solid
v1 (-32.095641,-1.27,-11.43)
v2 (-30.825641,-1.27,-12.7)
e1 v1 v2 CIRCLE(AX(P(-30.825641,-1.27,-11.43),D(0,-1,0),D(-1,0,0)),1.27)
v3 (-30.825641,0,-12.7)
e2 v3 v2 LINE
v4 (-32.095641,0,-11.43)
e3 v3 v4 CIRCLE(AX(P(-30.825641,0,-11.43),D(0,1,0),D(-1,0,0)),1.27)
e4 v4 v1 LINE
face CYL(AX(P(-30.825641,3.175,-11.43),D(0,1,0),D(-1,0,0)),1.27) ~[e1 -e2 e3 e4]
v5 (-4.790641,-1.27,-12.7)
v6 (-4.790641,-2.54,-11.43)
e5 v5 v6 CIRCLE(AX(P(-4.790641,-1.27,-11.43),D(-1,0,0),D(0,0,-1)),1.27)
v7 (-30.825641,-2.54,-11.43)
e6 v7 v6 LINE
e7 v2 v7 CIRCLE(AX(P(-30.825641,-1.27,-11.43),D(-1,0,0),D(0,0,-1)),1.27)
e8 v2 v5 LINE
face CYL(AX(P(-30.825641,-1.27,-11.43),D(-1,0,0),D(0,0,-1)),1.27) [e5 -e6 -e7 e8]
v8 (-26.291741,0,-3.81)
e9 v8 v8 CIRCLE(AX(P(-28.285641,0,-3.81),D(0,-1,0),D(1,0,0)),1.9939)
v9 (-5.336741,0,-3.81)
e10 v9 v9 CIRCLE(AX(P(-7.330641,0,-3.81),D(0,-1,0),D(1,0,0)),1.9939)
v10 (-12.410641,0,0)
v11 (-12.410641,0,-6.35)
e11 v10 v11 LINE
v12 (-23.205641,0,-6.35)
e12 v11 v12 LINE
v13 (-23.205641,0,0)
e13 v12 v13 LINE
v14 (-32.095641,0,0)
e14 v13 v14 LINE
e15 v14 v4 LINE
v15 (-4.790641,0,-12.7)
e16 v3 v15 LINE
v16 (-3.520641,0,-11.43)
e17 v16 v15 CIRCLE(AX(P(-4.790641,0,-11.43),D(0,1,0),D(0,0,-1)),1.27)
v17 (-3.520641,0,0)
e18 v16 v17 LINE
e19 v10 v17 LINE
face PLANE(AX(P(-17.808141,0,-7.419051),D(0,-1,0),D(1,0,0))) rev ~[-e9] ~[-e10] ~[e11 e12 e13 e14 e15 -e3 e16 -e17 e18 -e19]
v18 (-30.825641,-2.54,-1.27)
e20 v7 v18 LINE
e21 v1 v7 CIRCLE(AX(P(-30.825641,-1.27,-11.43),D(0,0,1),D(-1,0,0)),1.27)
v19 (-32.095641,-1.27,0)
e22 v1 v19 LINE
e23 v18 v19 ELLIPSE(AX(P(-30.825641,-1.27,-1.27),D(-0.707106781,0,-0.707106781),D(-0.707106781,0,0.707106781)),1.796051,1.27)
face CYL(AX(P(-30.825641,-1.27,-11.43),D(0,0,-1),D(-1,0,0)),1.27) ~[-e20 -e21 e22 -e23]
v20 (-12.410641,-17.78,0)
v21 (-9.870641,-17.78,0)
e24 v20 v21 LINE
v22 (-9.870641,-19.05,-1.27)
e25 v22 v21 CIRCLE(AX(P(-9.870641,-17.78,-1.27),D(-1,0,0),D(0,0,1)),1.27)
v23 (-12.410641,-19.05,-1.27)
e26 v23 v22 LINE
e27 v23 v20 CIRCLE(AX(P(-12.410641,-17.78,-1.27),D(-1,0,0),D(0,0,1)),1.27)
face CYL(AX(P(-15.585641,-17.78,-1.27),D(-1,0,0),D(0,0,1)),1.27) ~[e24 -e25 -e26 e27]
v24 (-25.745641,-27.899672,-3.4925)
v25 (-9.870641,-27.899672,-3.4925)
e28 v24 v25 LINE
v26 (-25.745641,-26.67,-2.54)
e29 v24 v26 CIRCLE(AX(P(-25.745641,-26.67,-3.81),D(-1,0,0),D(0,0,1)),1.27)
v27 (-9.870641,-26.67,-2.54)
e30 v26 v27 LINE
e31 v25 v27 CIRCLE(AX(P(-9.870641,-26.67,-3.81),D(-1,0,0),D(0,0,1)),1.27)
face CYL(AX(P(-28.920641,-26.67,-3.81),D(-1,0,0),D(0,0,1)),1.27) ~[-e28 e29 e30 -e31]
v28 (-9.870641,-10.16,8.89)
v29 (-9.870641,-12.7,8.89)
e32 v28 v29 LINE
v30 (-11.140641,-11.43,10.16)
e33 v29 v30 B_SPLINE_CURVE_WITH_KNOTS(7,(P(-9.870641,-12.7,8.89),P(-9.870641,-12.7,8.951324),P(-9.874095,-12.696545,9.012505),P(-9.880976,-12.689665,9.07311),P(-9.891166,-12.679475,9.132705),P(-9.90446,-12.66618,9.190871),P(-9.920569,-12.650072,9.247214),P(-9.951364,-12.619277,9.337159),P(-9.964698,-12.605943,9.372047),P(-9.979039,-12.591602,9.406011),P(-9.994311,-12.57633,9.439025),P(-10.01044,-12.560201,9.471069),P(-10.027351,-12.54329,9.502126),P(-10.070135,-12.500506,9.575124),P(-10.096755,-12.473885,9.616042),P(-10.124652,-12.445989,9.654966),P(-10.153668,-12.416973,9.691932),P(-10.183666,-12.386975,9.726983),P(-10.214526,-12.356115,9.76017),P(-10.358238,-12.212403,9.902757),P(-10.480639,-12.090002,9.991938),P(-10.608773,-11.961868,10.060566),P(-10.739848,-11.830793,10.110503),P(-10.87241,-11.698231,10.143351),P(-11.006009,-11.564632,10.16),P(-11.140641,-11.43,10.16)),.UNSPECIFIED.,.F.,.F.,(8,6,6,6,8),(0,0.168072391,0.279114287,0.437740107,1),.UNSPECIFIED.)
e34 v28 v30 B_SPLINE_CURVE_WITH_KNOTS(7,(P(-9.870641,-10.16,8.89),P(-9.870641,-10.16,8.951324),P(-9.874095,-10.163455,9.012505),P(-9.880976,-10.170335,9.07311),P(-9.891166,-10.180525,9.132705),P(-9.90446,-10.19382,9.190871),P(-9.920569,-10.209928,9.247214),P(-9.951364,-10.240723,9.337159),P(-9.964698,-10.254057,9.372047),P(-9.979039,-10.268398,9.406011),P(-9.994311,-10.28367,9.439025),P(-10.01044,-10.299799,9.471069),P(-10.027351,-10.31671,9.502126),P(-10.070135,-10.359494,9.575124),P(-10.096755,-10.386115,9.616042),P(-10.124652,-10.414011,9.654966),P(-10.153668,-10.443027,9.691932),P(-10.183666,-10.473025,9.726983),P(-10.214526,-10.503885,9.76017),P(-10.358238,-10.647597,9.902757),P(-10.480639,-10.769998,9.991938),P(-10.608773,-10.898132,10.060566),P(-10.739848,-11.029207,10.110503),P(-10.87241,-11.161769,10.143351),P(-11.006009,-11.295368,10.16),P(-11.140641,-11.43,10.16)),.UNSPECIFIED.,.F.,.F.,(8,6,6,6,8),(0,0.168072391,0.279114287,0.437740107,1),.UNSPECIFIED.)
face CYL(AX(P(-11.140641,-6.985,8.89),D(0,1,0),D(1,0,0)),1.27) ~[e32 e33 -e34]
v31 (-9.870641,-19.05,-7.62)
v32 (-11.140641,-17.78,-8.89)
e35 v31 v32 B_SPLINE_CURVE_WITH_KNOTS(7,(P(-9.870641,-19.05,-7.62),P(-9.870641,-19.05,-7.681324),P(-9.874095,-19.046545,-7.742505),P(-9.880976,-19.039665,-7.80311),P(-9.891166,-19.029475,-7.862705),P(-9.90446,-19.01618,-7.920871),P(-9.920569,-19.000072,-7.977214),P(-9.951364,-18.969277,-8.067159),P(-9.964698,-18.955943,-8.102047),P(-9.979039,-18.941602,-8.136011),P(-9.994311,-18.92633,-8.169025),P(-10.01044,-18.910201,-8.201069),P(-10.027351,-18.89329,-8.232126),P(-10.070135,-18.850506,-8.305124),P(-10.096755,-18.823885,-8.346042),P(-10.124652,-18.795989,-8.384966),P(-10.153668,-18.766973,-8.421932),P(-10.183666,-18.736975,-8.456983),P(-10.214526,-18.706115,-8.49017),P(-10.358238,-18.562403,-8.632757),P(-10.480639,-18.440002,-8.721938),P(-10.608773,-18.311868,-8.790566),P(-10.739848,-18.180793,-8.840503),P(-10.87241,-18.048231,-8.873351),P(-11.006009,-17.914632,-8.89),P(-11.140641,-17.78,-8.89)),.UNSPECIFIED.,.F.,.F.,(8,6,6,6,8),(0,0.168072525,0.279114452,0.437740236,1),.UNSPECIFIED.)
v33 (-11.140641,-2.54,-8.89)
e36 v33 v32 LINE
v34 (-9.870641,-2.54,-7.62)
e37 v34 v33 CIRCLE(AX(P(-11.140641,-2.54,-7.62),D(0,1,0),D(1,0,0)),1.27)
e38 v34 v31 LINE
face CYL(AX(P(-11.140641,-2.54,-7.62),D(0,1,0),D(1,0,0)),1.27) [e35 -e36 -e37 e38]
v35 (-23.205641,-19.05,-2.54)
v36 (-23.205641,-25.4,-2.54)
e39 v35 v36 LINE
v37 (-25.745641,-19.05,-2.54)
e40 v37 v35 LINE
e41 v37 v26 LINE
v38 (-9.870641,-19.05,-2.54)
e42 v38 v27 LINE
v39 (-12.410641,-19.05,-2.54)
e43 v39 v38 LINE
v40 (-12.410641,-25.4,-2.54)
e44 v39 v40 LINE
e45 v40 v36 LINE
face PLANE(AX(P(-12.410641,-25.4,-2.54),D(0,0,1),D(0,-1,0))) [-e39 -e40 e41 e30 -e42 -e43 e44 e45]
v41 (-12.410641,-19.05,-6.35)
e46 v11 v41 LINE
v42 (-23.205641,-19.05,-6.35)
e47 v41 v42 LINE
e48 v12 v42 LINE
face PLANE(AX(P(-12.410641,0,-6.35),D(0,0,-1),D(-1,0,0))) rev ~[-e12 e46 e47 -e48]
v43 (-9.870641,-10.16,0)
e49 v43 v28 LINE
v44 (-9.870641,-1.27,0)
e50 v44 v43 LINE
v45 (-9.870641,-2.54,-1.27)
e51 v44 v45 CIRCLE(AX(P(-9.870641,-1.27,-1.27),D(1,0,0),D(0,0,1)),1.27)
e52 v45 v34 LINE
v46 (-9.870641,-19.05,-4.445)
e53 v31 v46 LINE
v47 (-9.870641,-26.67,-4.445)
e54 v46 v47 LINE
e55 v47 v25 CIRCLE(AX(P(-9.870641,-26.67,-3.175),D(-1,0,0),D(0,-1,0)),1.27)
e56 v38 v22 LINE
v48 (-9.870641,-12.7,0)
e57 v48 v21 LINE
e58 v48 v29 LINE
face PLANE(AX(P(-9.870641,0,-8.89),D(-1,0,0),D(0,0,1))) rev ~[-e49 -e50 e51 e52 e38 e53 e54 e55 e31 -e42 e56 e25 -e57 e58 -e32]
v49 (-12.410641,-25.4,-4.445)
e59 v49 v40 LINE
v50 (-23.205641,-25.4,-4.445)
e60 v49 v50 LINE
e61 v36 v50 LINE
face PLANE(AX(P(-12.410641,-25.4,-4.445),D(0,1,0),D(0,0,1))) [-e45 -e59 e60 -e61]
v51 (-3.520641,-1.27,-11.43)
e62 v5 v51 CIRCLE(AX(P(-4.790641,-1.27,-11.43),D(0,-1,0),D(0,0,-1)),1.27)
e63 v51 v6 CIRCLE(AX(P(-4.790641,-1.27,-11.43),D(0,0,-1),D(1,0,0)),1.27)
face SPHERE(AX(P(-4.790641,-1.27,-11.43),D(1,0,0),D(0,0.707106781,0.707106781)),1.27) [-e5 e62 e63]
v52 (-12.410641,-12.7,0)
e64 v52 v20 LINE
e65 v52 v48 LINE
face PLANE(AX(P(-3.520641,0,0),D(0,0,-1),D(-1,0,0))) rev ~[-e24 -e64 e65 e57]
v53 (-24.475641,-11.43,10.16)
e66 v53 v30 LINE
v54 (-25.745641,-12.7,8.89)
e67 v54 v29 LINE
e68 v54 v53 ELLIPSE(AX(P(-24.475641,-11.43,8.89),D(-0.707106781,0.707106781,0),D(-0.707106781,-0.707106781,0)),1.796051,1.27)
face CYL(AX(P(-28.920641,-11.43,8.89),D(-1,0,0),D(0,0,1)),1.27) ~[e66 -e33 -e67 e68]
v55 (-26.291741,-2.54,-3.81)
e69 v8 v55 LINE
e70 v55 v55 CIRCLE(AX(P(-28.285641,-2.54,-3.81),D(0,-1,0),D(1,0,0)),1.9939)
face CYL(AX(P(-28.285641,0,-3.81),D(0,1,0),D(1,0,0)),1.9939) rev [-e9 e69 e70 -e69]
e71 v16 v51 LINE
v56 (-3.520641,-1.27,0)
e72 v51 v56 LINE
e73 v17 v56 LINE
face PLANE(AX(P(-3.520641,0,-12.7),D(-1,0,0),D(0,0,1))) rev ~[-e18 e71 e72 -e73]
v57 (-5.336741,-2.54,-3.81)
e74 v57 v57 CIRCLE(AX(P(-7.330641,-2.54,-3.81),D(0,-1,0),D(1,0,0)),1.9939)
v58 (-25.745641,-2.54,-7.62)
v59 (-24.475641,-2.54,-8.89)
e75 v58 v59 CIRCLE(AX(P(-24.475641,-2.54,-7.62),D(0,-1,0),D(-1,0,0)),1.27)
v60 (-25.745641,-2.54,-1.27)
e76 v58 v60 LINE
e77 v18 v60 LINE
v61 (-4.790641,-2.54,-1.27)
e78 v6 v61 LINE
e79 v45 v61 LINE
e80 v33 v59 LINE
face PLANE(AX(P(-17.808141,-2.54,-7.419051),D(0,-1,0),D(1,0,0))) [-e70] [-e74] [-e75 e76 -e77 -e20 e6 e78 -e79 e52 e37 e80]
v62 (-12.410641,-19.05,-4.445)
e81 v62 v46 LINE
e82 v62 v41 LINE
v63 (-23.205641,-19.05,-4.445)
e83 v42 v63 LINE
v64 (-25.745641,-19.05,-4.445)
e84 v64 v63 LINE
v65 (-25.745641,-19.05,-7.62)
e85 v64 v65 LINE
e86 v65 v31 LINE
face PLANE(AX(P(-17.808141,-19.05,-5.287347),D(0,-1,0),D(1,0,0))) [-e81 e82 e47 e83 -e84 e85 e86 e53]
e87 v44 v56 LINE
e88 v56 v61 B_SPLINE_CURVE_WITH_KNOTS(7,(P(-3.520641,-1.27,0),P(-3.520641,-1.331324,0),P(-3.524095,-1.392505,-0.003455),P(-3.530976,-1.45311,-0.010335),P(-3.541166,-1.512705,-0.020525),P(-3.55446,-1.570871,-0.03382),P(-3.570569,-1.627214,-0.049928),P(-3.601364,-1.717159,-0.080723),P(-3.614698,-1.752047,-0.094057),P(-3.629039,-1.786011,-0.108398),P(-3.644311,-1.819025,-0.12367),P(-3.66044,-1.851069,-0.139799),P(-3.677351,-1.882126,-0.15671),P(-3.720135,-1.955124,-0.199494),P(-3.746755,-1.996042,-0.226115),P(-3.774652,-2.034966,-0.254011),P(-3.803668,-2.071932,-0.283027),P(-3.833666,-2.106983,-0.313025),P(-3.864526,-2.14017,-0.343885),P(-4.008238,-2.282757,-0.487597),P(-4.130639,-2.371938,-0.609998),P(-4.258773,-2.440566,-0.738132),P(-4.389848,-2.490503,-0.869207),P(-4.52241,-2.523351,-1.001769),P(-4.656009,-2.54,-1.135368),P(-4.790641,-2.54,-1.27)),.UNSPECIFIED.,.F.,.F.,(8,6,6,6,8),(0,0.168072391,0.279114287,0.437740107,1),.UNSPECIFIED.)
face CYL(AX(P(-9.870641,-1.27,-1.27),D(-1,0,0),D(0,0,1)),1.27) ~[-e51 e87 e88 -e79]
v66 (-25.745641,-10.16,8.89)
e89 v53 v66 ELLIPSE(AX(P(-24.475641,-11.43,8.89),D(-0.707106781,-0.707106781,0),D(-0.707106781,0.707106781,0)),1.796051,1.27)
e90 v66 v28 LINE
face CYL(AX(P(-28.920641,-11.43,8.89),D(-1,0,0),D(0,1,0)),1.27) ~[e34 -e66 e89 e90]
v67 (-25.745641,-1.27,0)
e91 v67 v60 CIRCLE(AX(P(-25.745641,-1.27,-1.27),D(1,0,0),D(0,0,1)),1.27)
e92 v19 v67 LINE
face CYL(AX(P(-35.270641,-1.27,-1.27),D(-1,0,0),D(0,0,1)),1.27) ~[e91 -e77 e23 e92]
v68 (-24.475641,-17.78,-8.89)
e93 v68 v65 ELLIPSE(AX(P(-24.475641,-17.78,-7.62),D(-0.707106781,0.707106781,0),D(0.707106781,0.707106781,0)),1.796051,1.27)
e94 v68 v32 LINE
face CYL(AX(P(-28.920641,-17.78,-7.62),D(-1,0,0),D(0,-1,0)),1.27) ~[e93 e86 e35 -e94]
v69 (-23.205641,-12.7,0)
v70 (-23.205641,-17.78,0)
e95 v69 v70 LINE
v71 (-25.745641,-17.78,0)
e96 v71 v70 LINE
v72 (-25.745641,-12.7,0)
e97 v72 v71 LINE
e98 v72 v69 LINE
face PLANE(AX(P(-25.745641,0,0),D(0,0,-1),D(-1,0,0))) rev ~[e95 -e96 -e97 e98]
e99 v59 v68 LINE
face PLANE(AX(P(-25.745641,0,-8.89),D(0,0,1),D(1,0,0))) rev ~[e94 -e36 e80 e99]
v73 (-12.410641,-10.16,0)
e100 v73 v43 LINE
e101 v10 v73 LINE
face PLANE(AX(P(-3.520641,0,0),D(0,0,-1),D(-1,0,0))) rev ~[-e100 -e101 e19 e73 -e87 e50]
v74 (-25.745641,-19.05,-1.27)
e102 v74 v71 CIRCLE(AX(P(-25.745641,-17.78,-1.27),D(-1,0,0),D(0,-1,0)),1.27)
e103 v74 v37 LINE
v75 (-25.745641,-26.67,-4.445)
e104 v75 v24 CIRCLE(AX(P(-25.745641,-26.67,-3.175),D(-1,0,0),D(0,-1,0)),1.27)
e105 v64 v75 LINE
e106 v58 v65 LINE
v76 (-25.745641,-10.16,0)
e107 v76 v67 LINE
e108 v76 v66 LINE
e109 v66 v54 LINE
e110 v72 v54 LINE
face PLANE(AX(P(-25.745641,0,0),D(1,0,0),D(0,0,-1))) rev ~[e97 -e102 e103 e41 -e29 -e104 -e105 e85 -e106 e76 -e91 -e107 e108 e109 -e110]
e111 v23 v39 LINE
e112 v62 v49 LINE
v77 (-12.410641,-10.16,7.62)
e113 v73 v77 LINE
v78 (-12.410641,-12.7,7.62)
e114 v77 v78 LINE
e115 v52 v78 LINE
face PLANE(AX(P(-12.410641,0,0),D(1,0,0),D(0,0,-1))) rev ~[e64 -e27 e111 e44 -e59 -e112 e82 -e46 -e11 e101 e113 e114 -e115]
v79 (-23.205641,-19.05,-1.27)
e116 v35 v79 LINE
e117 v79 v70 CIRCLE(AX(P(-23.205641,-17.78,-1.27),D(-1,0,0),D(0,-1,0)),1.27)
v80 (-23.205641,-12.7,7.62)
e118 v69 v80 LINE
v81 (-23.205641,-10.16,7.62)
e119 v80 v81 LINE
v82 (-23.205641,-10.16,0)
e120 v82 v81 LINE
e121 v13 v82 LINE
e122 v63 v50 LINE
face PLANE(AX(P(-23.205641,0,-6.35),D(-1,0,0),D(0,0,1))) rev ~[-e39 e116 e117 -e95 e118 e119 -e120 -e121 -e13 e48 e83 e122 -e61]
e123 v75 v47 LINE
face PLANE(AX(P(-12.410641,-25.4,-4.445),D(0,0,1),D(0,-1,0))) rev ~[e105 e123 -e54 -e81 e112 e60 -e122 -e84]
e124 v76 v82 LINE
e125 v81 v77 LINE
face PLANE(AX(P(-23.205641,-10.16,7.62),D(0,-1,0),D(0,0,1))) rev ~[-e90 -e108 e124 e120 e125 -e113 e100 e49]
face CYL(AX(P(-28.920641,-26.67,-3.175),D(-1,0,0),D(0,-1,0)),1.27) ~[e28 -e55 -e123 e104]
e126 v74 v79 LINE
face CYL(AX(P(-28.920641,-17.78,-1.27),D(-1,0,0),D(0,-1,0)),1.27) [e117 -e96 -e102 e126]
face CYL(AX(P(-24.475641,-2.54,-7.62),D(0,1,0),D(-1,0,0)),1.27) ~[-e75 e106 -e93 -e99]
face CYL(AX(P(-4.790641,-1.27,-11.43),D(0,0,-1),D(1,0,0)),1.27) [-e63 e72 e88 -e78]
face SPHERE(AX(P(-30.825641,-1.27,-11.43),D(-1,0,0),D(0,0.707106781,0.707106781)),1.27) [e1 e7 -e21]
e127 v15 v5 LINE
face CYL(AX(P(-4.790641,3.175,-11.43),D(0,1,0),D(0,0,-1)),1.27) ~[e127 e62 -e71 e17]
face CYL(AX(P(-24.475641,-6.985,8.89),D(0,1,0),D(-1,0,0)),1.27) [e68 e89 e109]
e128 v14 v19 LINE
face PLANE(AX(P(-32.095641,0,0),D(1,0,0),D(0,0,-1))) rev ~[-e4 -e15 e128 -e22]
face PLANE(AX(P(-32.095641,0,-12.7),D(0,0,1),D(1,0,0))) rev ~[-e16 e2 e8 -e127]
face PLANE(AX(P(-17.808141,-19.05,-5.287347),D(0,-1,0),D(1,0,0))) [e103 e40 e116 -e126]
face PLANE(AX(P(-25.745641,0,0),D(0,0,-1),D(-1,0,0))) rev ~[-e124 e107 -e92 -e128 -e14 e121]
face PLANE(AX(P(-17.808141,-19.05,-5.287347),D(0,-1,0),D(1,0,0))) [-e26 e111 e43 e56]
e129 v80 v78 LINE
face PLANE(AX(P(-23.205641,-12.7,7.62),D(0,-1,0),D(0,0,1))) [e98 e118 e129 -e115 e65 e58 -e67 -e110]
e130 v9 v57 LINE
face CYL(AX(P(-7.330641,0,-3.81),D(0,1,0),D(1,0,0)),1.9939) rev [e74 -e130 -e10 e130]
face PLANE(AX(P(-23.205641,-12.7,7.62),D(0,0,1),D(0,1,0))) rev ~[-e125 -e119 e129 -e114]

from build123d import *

# Parameters (mm, degrees)
F1_DEPTH      = 19.05
F0_R          = 1.9939
F2_DEPTH      = 2.54
F3_W          = 2.54
F3_H          = 1.905
F4_DEPTH      = 8.89
F5_W          = 2.54
F5_H          = 1.905
F6_DEPTH      = 11.43
F7_W          = 2.54
F7_H          = 2.54
F8_W          = 2.54
F8_H          = 2.54
F9_DEPTH      = 10.16
F10_W         = 2.54
F10_H         = 2.54
F11_DEPTH     = 11.43
F12_T1_DEPTH  = 9.525
F12_T3_DEPTH  = 14.605
F12_T5_DEPTH  = 26.035
F12_T7_DEPTH  = 9.525
F12_T9_DEPTH  = 4.445
F12_T11_DEPTH = 19.685
F12_T13_DEPTH = 22.225
F12_T15_DEPTH = 8.89
F12_T17_DEPTH = 8.89
F12_T19_DEPTH = 8.89
F12_S23_W     = 1.27
F12_S23_H     = 1.27
F12_T24_DEPTH = 1.27
F12_S29_W     = 1.27
F12_S29_H     = 1.27
F12_T30_DEPTH = 1.27


# Not quite as in the source:
# - a fillet or chamfer that OpenCascade refuses, or shapes differently, is made with other operations: its cross-section is extruded or revolved along the edge and cut away or added


with BuildPart() as f1:
    # F0 (on Front) → F1 (new body)
    with BuildSketch(Plane.XZ):
        Polygon((-23.2056408978, -6.35), (-23.2056408978, 0), (-25.7456408978, 0), (-25.7456408978, -8.89), (-9.8706408978, -8.89), (-9.8706408978, 0), (-12.4106408978, 0), (-12.4106408978, -6.35), align=None)
    extrude(amount=F1_DEPTH)

    # F0 (on Front) → F2 (join)
    with BuildSketch(Plane.XZ):
        Polygon((-25.7456408978, -8.89), (-25.7456408978, 0), (-32.0956408978, 0), (-32.0956408978, -12.7), (-3.5206408978, -12.7), (-3.5206408978, 0), (-9.8706408978, 0), (-9.8706408978, -8.89), align=None)
        with Locations((-28.2856408978, -3.81)):
            Circle(F0_R, mode=Mode.SUBTRACT)
        with Locations((-7.3306408978, -3.81)):
            Circle(F0_R, mode=Mode.SUBTRACT)
    extrude(amount=F2_DEPTH)

    # F3 (on face) → F4 (join)
    with BuildSketch(Plane.XZ.offset(19.05)):
        with Locations((-11.1406408978, -3.4925)):
            Rectangle(F3_W, F3_H)
        with Locations((-24.4756408978, -3.4925)):
            Rectangle(F3_W, F3_H)
    extrude(amount=F4_DEPTH)

    # F5 (on face) → F6 (join)
    with BuildSketch(Plane(origin=(-12.4106408978, 0, 0), x_dir=(0, -1, 0), z_dir=(-1, 0, 0))):
        with Locations((26.67, -3.4925)):
            Rectangle(F5_W, F5_H)
    extrude(amount=F6_DEPTH)

    # F7 (on face) + F8 (on face) → F9 (join)
    with BuildSketch(Plane.XY):
        with Locations((-24.4756408978, -11.43)):
            Rectangle(F7_W, F7_H)
    with BuildSketch(Plane.XY):
        with Locations((-11.1406408978, -11.43)):
            Rectangle(F8_W, F8_H)
    extrude(amount=F9_DEPTH)

    # F10 (on face) → F11 (join)
    with BuildSketch(Plane.YZ.offset(-23.2056408978)):
        with Locations((-11.43, 8.89)):
            Rectangle(F10_W, F10_H)
    extrude(amount=F11_DEPTH)

    # F12: fillet of radius 1.27 on 18 edges, made by hand

    # F12_s2 → F12_t1 (cut)
    with BuildSketch(Plane.YZ.offset(-35.2706408978)):
        with BuildLine():
            ThreePointArc((-1.27, 0), (-2.1680256121, -0.3719743879), (-2.54, -1.27))
            Line((-2.54, -1.27), (-2.54, 0))
            Line((-2.54, 0), (-1.27, 0))
        make_face()
    extrude(amount=F12_T1_DEPTH, mode=Mode.SUBTRACT)

    # F12_s4 → F12_t3 (cut)
    with BuildSketch(Plane.XY.offset(-11.43)):
        with BuildLine():
            ThreePointArc((-32.0956408978, -1.27), (-31.7236665099, -2.1680256121), (-30.8256408978, -2.54))
            Line((-30.8256408978, -2.54), (-32.0956408978, -2.54))
            Line((-32.0956408978, -2.54), (-32.0956408978, -1.27))
        make_face()
        with BuildLine():
            ThreePointArc((-3.5206408978, -1.27), (-3.8926152856, -2.1680256121), (-4.7906408978, -2.54))
            Line((-4.7906408978, -2.54), (-3.5206408978, -2.54))
            Line((-3.5206408978, -2.54), (-3.5206408978, -1.27))
        make_face()
    extrude(amount=F12_T3_DEPTH, mode=Mode.SUBTRACT)

    # F12_s6 → F12_t5 (cut)
    with BuildSketch(Plane.YZ.offset(-30.8256408978)):
        with BuildLine():
            ThreePointArc((-1.27, -12.7), (-2.1680256121, -12.3280256121), (-2.54, -11.43))
            Line((-2.54, -11.43), (-2.54, -12.7))
            Line((-2.54, -12.7), (-1.27, -12.7))
        make_face()
    extrude(amount=F12_T5_DEPTH, mode=Mode.SUBTRACT)

    # F12_s8 → F12_t7 (cut)
    with BuildSketch(Plane.YZ.offset(-9.8706408978)):
        with BuildLine():
            ThreePointArc((-1.27, 0), (-2.1680256121, -0.3719743879), (-2.54, -1.27))
            Line((-2.54, -1.27), (-2.54, 0))
            Line((-2.54, 0), (-1.27, 0))
        make_face()
    extrude(amount=F12_T7_DEPTH, mode=Mode.SUBTRACT)

    # F12_s10 → F12_t9 (cut)
    with BuildSketch(Plane.XZ.offset(-3.175)):
        with BuildLine():
            ThreePointArc((-4.7906408978, -12.7), (-3.8926152856, -12.3280256121), (-3.5206408978, -11.43))
            Line((-3.5206408978, -11.43), (-3.5206408978, -12.7))
            Line((-3.5206408978, -12.7), (-4.7906408978, -12.7))
        make_face()
        with BuildLine():
            ThreePointArc((-32.0956408978, -11.43), (-31.7236665099, -12.3280256121), (-30.8256408978, -12.7))
            Line((-30.8256408978, -12.7), (-32.0956408978, -12.7))
            Line((-32.0956408978, -12.7), (-32.0956408978, -11.43))
        make_face()
    extrude(amount=F12_T9_DEPTH, mode=Mode.SUBTRACT)

    # F12_s12 → F12_t11 (cut)
    with BuildSketch(Plane.XZ.offset(2.54)):
        with BuildLine():
            ThreePointArc((-9.8706408978, -7.62), (-10.2426152856, -8.5180256121), (-11.1406408978, -8.89))
            Line((-11.1406408978, -8.89), (-9.8706408978, -8.89))
            Line((-9.8706408978, -8.89), (-9.8706408978, -7.62))
        make_face()
        with BuildLine():
            ThreePointArc((-25.7456408978, -7.62), (-25.3736665099, -8.5180256121), (-24.4756408978, -8.89))
            Line((-24.4756408978, -8.89), (-25.7456408978, -8.89))
            Line((-25.7456408978, -8.89), (-25.7456408978, -7.62))
        make_face()
    extrude(amount=F12_T11_DEPTH, mode=Mode.SUBTRACT)

    # F12_s14 → F12_t13 (cut)
    with BuildSketch(Plane.YZ.offset(-28.9206408978)):
        with BuildLine():
            ThreePointArc((-26.67, -2.54), (-27.5680256121, -2.9119743879), (-27.94, -3.81))
            Line((-27.94, -3.81), (-27.94, -2.54))
            Line((-27.94, -2.54), (-26.67, -2.54))
        make_face()
        with BuildLine():
            ThreePointArc((-19.05, -7.62), (-18.6780256121, -8.5180256121), (-17.78, -8.89))
            Line((-17.78, -8.89), (-19.05, -8.89))
            Line((-19.05, -8.89), (-19.05, -7.62))
        make_face()
        with BuildLine():
            ThreePointArc((-27.94, -3.175), (-27.5680256121, -4.0730256121), (-26.67, -4.445))
            Line((-26.67, -4.445), (-27.94, -4.445))
            Line((-27.94, -4.445), (-27.94, -3.175))
        make_face()
        with BuildLine():
            ThreePointArc((-11.43, 10.16), (-12.3280256121, 9.7880256121), (-12.7, 8.89))
            Line((-12.7, 8.89), (-12.7, 10.16))
            Line((-12.7, 10.16), (-11.43, 10.16))
        make_face()
        with BuildLine():
            ThreePointArc((-10.16, 8.89), (-10.5319743879, 9.7880256121), (-11.43, 10.16))
            Line((-11.43, 10.16), (-10.16, 10.16))
            Line((-10.16, 10.16), (-10.16, 8.89))
        make_face()
    extrude(amount=F12_T13_DEPTH, mode=Mode.SUBTRACT)

    # F12_s16 → F12_t15 (cut)
    with BuildSketch(Plane.YZ.offset(-28.9206408978)):
        with BuildLine():
            ThreePointArc((-19.05, -1.27), (-18.6780256121, -0.3719743879), (-17.78, 0))
            Line((-17.78, 0), (-19.05, 0))
            Line((-19.05, 0), (-19.05, -1.27))
        make_face()
    extrude(amount=F12_T15_DEPTH, mode=Mode.SUBTRACT)

    # F12_s18 → F12_t17 (cut)
    with BuildSketch(Plane.YZ.offset(-15.5856408978)):
        with BuildLine():
            ThreePointArc((-17.78, 0), (-18.6780256121, -0.3719743879), (-19.05, -1.27))
            Line((-19.05, -1.27), (-19.05, 0))
            Line((-19.05, 0), (-17.78, 0))
        make_face()
    extrude(amount=F12_T17_DEPTH, mode=Mode.SUBTRACT)

    # F12_s20 → F12_t19 (cut)
    with BuildSketch(Plane.XZ.offset(6.985)):
        with BuildLine():
            ThreePointArc((-25.7456408978, 8.89), (-25.3736665099, 9.7880256121), (-24.4756408978, 10.16))
            Line((-24.4756408978, 10.16), (-25.7456408978, 10.16))
            Line((-25.7456408978, 10.16), (-25.7456408978, 8.89))
        make_face()
        with BuildLine():
            ThreePointArc((-9.8706408978, 8.89), (-10.2426152856, 9.7880256121), (-11.1406408978, 10.16))
            Line((-11.1406408978, 10.16), (-9.8706408978, 10.16))
            Line((-9.8706408978, 10.16), (-9.8706408978, 8.89))
        make_face()
    extrude(amount=F12_T19_DEPTH, mode=Mode.SUBTRACT)


with BuildPart() as f12_tool22:
    # F12_s23 → F12_t24 (new body)
    with BuildSketch(Plane.YZ.offset(-30.8256408978)):
        with Locations((-1.905, -12.065)):
            Rectangle(F12_S23_W, F12_S23_H)
    extrude(amount=-F12_T24_DEPTH)

    # F12_s25 → F12_t26 (revolve, cut)
    with BuildSketch(Plane(origin=(-30.8256408978, -1.27, -11.43), x_dir=(0, 0.7071067812, 0.7071067812), z_dir=(0, -0.7071067812, 0.7071067812))):
        with BuildLine():
            ThreePointArc((0, -1.27), (1.27, 0), (0, 1.27))
            Line((0, 1.27), (0, -1.27))
        make_face()
    revolve(axis=Axis((-30.8256408978, -1.27, -11.43), (-1, 0, 0)), mode=Mode.SUBTRACT)


with BuildPart() as f1_1:
    add(f1.part)

    # F12_t21: cut F12_tool22
    add(f12_tool22.part, mode=Mode.SUBTRACT)


with BuildPart() as f12_tool28:
    # F12_s29 → F12_t30 (new body)
    with BuildSketch(Plane.YZ.offset(-4.7906408978)):
        with Locations((-1.905, -12.065)):
            Rectangle(F12_S29_W, F12_S29_H)
    extrude(amount=F12_T30_DEPTH)

    # F12_s31 → F12_t32 (revolve, cut)
    with BuildSketch(Plane(origin=(-4.7906408978, -1.27, -11.43), x_dir=(0, 0.7071067812, 0.7071067812), z_dir=(0, 0.7071067812, -0.7071067812))):
        with BuildLine():
            ThreePointArc((0, -1.27), (1.27, 0), (0, 1.27))
            Line((0, 1.27), (0, -1.27))
        make_face()
    revolve(axis=Axis((-4.7906408978, -1.27, -11.43), (1, 0, 0)), mode=Mode.SUBTRACT)


with BuildPart() as f1_2:
    add(f1_1.part)

    # F12_t27: cut F12_tool28
    add(f12_tool28.part, mode=Mode.SUBTRACT)


solid = f1_2.part
